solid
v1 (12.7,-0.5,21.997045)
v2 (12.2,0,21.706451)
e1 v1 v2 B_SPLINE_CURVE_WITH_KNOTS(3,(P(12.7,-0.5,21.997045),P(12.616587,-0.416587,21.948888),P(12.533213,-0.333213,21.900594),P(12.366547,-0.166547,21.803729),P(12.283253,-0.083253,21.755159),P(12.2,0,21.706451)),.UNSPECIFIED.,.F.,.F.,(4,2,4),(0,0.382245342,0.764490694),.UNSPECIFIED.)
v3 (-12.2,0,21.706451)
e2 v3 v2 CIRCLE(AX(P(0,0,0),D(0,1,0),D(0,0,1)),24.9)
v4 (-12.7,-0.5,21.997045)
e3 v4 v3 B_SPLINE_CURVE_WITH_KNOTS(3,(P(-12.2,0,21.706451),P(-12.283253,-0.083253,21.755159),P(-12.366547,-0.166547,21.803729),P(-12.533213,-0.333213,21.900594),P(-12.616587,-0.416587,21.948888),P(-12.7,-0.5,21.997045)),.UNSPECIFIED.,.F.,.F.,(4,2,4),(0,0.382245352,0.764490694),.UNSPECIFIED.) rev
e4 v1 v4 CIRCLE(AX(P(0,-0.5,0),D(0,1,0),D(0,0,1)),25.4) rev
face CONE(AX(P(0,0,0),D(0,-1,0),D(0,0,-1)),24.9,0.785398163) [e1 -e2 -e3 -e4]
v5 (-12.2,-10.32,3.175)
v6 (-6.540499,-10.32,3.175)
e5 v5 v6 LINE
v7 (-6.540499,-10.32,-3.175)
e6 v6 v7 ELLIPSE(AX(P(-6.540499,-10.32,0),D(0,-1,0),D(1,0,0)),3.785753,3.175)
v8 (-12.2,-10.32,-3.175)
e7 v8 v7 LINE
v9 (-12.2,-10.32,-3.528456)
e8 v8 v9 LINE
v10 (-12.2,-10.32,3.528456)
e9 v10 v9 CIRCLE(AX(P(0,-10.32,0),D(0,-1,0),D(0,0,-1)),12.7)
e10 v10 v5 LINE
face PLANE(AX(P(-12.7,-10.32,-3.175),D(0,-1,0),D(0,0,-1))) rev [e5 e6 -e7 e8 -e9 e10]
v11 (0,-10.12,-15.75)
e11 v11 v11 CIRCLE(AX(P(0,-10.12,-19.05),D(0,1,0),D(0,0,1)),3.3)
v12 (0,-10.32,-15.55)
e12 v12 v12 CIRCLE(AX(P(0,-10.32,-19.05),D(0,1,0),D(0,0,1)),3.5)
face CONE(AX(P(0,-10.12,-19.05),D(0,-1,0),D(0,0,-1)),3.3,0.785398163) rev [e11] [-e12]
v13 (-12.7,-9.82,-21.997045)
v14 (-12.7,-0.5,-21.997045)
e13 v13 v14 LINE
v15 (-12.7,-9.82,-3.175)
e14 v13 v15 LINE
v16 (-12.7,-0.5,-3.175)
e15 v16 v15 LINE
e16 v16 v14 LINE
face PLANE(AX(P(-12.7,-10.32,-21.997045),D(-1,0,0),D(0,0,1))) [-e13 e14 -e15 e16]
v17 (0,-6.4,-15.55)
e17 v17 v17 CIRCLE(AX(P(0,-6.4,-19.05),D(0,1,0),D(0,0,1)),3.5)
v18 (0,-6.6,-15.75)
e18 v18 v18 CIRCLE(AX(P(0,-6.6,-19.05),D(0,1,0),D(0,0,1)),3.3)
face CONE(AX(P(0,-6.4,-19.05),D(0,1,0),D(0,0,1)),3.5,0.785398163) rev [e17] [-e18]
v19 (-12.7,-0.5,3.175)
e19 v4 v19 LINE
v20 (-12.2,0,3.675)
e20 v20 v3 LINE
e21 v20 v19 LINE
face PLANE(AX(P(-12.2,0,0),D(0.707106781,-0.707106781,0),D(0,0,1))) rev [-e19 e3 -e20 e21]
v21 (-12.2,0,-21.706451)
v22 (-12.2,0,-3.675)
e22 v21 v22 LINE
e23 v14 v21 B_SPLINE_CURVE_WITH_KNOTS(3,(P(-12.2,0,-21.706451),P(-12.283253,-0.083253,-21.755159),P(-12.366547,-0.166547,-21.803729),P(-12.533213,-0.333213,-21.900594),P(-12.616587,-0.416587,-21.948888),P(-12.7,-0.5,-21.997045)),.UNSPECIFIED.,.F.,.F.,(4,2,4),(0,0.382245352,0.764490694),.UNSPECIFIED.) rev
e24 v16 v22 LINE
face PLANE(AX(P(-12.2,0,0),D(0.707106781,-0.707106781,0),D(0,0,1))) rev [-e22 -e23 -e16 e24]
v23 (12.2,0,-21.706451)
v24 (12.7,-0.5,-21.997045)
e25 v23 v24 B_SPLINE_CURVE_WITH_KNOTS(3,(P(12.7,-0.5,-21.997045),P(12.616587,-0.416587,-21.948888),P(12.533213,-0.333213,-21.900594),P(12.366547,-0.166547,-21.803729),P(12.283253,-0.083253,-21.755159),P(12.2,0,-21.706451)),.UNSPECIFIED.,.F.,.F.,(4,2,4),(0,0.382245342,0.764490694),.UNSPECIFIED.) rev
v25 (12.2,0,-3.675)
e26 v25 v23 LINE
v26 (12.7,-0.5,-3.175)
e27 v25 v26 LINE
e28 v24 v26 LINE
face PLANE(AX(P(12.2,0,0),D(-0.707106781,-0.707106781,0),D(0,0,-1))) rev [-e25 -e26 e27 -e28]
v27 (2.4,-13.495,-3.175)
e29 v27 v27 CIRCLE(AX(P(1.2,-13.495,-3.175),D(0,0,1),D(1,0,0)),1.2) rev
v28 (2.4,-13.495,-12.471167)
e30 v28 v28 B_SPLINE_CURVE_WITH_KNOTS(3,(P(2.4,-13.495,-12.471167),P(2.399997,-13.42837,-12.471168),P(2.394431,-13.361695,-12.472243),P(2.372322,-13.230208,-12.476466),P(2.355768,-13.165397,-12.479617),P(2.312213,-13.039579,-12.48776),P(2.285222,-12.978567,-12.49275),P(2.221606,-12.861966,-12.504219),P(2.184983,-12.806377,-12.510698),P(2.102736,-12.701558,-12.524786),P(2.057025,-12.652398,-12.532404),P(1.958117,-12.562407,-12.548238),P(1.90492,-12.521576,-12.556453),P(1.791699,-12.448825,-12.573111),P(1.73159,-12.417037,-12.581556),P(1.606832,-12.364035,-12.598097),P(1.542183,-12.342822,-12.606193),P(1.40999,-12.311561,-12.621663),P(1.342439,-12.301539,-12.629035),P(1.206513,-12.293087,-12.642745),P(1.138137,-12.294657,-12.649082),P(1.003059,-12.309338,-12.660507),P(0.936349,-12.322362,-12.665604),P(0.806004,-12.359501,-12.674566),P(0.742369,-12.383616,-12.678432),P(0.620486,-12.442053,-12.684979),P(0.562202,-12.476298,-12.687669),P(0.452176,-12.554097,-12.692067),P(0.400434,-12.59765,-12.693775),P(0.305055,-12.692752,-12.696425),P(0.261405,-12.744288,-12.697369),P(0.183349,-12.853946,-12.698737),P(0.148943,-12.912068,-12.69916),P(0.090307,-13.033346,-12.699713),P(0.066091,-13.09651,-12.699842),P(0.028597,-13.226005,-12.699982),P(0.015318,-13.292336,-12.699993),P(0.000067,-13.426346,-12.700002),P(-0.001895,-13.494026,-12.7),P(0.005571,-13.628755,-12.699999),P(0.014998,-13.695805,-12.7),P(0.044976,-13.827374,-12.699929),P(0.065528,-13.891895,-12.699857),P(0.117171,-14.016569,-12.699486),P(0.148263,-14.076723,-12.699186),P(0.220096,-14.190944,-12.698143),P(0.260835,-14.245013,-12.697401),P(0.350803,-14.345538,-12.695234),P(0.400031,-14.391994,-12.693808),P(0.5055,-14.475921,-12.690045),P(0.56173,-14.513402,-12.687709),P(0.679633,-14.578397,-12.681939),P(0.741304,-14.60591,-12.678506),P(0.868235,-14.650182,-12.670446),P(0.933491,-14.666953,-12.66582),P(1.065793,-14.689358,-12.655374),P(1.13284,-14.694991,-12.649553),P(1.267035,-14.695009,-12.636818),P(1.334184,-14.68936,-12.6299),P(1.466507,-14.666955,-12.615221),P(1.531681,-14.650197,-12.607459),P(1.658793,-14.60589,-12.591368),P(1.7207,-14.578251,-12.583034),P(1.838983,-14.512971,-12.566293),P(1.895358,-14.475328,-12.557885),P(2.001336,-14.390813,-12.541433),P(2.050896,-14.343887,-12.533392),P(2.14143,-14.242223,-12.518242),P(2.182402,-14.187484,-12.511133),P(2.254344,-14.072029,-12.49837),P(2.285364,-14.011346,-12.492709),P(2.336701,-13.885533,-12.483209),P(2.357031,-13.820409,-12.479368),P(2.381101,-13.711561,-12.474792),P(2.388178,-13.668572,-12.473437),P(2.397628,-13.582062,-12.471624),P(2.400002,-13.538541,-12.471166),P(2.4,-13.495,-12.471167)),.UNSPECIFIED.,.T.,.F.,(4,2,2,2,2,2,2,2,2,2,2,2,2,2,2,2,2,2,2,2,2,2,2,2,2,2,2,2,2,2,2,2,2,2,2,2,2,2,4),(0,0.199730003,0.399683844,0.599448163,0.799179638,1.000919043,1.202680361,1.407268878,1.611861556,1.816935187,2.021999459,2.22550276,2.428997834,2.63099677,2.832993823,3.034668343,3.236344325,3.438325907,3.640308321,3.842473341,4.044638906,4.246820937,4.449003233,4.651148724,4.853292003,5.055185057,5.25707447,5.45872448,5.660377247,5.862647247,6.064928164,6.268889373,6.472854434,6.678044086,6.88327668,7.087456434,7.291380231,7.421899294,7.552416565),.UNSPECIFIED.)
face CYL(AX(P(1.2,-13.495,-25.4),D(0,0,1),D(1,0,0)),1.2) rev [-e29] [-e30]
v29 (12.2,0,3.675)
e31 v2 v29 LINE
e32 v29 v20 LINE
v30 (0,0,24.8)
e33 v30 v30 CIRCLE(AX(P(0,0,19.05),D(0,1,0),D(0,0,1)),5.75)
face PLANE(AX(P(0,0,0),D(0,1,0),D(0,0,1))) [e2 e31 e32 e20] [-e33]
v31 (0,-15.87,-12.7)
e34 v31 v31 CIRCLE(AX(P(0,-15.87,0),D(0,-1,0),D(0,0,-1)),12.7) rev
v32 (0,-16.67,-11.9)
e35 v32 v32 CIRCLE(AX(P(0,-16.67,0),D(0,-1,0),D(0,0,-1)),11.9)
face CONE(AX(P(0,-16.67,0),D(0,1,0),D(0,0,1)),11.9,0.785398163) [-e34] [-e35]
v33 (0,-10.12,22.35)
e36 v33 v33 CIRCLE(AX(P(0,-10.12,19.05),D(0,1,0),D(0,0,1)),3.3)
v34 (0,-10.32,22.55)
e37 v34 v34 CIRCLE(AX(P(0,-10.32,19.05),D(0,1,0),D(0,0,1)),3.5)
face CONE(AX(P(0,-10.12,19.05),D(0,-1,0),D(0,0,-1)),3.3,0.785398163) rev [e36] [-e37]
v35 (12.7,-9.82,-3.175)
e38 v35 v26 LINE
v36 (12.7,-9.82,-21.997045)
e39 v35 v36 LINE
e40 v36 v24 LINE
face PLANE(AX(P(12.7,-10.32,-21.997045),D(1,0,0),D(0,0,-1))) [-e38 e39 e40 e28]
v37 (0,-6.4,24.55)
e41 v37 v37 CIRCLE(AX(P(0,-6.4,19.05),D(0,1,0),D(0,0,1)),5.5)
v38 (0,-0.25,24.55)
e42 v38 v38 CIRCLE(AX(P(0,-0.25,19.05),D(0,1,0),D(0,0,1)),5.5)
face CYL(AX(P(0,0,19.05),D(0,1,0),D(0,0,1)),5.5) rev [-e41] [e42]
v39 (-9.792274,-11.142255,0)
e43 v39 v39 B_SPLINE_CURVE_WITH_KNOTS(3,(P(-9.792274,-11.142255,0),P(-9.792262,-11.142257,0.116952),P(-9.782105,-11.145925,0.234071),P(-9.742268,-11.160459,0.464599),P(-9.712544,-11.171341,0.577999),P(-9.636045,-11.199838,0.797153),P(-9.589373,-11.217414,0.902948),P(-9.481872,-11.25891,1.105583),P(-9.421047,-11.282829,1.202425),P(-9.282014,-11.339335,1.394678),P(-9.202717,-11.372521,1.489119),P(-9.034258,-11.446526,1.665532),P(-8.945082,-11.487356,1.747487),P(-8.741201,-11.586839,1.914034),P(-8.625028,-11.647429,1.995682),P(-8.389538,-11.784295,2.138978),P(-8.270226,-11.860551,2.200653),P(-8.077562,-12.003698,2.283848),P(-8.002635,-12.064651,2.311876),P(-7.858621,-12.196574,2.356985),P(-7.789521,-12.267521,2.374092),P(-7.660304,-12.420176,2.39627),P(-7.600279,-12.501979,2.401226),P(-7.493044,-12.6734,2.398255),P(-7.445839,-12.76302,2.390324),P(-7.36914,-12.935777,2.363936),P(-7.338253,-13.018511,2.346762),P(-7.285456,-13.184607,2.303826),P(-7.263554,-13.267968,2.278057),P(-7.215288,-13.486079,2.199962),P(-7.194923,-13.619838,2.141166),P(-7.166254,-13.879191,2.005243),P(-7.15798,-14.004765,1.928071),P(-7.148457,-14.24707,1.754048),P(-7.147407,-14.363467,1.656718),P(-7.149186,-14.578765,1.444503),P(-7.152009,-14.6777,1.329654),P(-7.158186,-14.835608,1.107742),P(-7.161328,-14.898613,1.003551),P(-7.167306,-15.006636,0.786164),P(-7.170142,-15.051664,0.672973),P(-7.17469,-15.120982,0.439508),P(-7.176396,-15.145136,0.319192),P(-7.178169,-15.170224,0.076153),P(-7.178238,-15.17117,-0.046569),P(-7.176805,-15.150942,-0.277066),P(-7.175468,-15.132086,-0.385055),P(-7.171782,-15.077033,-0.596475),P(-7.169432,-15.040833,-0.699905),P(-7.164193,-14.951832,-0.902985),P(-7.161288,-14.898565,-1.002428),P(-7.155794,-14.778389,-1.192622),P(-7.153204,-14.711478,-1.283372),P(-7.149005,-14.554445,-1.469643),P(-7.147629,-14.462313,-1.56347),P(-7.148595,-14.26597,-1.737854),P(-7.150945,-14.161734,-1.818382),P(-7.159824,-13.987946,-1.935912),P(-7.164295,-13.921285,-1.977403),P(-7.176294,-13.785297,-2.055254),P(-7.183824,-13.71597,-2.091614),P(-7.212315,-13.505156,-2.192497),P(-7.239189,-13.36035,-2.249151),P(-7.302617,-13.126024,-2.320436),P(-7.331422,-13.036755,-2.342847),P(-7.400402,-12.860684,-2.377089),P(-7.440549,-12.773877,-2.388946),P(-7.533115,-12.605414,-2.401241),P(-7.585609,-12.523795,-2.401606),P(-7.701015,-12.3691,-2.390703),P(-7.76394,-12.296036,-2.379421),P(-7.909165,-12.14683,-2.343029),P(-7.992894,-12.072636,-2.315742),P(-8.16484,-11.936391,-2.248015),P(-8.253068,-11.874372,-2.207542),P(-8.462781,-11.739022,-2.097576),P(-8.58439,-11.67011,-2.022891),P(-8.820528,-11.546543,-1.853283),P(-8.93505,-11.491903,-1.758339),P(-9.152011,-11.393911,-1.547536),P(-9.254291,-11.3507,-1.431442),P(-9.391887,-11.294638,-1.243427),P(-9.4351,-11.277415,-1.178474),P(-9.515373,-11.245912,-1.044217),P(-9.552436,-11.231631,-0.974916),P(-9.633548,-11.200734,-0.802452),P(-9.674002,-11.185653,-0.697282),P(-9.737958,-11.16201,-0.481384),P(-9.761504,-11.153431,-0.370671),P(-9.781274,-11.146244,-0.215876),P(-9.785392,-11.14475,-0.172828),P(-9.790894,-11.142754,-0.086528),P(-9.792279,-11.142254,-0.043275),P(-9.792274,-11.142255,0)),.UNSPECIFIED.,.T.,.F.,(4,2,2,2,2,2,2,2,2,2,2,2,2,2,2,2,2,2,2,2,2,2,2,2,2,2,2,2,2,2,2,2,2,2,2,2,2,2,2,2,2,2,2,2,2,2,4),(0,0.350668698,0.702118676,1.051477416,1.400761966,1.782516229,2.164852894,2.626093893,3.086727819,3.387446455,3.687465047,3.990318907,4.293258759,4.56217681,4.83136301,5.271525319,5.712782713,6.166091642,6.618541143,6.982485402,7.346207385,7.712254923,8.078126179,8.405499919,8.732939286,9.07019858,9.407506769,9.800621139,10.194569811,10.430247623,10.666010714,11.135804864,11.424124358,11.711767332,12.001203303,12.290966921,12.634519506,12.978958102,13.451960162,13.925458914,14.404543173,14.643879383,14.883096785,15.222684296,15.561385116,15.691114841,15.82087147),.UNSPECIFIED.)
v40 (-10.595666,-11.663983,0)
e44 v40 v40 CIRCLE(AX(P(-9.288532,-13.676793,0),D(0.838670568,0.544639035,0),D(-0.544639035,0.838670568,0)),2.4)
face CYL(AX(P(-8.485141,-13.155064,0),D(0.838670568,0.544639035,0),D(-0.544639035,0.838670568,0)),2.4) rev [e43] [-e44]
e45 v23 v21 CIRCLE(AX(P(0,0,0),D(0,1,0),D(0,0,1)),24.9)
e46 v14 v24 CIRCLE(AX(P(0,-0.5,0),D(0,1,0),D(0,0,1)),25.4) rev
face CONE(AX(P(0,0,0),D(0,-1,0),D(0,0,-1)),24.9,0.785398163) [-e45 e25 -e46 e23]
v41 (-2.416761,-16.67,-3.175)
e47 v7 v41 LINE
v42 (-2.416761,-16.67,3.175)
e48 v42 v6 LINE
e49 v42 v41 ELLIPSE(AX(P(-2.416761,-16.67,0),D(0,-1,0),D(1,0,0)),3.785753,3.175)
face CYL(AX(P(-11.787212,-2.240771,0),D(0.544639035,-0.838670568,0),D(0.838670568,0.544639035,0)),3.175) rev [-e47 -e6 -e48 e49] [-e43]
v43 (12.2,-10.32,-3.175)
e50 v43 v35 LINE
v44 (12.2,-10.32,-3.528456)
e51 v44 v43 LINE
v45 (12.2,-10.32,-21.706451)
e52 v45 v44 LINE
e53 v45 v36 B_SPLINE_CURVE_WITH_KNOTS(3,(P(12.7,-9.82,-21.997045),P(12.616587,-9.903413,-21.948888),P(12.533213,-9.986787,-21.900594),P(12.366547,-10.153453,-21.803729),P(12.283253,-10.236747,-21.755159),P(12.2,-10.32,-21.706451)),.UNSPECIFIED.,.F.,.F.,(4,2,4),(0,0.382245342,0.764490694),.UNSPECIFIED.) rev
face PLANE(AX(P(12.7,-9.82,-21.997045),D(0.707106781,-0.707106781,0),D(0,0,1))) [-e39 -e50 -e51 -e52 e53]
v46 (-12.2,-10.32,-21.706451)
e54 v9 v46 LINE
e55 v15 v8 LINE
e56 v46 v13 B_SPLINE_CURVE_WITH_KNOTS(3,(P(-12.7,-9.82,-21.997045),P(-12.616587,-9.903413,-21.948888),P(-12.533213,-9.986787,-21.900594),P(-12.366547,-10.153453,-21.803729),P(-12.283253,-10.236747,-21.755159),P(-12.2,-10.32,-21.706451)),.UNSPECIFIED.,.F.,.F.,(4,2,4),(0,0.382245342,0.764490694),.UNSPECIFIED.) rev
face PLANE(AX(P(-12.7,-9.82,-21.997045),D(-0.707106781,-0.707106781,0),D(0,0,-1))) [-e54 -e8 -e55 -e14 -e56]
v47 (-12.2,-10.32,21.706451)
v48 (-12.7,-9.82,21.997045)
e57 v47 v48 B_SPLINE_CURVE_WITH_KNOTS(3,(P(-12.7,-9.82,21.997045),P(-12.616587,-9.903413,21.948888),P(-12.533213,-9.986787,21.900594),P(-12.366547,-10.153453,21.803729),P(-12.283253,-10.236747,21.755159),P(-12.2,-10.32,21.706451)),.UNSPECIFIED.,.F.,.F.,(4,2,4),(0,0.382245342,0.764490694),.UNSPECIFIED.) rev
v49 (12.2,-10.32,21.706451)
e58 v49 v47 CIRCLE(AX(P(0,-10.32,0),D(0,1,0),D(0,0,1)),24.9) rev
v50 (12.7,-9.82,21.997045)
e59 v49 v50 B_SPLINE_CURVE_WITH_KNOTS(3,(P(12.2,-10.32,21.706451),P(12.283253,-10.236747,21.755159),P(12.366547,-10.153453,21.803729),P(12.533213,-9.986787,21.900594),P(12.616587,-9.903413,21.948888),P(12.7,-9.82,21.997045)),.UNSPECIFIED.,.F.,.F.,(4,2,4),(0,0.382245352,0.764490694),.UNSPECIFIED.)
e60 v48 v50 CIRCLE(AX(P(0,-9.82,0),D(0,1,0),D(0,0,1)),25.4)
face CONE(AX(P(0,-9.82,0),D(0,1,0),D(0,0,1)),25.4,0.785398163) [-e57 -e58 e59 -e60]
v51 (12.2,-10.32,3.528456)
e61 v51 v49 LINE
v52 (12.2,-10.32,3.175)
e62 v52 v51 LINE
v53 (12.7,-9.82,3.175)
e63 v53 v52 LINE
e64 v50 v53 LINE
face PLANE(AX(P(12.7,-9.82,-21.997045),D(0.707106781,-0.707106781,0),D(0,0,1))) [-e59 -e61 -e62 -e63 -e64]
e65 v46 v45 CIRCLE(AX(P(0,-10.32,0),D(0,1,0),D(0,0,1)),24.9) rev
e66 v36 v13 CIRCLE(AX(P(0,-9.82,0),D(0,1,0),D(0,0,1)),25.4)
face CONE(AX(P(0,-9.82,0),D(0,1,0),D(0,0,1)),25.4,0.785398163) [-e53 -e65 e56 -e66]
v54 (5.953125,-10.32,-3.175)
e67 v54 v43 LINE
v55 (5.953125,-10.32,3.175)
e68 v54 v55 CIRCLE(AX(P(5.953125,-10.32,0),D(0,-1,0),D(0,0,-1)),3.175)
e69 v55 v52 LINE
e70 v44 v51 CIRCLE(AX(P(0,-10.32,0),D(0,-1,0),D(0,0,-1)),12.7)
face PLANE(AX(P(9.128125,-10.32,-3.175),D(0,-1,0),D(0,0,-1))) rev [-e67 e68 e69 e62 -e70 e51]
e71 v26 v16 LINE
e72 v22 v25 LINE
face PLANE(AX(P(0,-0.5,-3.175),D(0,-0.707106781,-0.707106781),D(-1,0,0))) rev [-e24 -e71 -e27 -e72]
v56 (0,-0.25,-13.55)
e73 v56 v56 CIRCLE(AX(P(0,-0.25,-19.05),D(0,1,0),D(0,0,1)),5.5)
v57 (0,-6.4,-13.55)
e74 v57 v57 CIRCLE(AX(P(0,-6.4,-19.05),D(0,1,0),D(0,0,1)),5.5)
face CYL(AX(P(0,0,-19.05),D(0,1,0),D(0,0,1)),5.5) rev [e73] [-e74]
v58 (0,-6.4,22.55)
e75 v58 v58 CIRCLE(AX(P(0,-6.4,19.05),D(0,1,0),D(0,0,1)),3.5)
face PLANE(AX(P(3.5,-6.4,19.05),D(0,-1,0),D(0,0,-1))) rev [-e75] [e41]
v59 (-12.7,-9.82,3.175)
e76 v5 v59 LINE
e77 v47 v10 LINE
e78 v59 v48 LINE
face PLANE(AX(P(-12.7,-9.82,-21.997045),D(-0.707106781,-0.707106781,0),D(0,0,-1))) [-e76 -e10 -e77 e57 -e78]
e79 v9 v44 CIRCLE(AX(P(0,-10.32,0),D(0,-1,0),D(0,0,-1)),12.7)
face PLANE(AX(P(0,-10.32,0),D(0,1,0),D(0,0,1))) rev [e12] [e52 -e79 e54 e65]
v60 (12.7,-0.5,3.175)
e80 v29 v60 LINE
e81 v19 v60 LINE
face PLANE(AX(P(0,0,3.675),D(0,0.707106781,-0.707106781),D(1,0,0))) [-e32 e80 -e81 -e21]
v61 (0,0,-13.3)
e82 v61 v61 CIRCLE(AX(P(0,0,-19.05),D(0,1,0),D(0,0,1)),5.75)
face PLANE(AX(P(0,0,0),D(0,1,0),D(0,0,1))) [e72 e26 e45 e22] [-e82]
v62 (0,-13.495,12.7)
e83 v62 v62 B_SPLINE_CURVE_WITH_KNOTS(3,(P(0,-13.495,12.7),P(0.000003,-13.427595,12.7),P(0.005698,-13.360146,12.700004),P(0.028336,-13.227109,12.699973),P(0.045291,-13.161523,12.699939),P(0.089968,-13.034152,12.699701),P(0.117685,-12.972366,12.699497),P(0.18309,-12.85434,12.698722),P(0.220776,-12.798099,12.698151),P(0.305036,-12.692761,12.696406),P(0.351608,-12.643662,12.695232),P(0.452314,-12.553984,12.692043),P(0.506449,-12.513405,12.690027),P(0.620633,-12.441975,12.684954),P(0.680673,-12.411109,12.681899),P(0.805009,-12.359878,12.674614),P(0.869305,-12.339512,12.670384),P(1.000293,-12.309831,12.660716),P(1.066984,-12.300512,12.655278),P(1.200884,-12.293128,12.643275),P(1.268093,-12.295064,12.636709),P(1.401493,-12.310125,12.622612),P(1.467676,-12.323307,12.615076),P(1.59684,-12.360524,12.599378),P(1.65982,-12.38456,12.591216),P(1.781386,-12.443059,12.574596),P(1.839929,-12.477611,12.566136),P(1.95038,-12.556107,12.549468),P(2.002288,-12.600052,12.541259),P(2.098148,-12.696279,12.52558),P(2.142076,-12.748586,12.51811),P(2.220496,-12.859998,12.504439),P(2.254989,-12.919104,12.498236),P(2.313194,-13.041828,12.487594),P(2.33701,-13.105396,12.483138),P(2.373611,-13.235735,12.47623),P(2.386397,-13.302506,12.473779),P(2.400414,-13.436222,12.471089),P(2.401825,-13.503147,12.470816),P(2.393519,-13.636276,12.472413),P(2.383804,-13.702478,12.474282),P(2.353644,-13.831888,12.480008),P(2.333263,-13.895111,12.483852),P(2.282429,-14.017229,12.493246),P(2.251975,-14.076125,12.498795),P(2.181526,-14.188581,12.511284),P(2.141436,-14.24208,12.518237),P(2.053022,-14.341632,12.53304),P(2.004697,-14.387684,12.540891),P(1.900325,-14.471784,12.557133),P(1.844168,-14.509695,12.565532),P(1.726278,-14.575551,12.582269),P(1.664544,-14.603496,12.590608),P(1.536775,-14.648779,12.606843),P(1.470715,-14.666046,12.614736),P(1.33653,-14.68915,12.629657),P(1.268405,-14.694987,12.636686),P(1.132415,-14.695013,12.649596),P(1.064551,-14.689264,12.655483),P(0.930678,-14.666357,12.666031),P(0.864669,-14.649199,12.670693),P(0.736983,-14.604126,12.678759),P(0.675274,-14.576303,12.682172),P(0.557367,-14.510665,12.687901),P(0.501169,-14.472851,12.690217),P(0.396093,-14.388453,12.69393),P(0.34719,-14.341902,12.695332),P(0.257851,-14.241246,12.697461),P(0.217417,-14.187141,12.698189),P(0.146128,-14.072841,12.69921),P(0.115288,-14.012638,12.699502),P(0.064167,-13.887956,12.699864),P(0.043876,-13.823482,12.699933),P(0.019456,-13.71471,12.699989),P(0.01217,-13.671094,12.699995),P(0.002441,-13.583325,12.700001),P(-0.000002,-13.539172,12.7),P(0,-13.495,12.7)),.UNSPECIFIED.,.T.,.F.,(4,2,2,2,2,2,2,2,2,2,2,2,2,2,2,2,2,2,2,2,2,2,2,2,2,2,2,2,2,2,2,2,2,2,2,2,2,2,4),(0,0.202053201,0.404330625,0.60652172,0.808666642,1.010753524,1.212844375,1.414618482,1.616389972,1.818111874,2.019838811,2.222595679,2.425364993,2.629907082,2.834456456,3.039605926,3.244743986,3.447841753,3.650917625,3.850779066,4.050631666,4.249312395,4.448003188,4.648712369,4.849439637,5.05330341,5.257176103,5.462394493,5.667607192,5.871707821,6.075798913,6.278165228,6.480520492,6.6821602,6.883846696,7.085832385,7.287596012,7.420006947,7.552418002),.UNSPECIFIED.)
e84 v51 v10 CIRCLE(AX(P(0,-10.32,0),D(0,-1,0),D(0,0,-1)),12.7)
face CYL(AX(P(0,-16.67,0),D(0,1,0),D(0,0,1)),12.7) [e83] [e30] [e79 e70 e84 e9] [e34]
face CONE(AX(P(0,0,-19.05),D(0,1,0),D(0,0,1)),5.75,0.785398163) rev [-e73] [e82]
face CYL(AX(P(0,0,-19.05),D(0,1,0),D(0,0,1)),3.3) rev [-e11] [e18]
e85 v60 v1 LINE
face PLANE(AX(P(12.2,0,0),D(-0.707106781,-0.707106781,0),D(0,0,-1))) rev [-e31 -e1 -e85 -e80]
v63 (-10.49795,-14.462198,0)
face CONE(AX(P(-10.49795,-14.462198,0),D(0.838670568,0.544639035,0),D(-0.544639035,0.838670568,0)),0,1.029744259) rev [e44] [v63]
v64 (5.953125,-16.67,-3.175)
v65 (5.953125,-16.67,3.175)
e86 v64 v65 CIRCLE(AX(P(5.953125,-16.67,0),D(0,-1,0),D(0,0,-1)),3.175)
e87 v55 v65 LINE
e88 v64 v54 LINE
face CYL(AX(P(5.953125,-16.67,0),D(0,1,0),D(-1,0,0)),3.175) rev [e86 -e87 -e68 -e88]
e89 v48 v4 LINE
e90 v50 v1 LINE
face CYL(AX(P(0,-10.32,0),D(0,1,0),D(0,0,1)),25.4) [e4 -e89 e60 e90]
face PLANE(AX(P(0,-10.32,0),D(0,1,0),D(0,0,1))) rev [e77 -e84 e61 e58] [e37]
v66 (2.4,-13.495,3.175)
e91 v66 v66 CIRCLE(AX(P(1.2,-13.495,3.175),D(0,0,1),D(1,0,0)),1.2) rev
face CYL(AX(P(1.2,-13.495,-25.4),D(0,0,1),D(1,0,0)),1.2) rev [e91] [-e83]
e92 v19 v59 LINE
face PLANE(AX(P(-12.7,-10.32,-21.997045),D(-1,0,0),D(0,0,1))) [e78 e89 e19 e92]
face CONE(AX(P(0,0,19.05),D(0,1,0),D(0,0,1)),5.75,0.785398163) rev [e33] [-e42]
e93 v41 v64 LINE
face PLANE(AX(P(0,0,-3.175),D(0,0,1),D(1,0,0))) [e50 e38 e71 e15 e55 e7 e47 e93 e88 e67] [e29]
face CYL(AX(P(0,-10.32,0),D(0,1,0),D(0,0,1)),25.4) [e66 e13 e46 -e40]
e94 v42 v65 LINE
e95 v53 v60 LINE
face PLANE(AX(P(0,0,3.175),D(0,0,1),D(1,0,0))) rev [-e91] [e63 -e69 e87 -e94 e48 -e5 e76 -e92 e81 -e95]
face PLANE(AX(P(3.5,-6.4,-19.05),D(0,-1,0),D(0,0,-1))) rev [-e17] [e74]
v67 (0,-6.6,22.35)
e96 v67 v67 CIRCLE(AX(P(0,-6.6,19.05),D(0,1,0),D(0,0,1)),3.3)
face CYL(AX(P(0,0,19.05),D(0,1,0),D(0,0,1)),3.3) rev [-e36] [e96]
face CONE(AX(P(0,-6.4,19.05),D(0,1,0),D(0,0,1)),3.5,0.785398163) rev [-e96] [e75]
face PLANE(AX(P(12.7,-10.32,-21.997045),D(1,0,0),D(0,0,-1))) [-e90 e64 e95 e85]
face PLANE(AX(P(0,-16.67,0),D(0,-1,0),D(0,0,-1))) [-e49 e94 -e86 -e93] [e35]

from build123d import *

# Parameters (mm, degrees)
BOSS_EXTRUDE1_DEPTH                          = 10.32
SKETCH2_R                                    = 12.7
BOSS_EXTRUDE2_DEPTH                          = 6.35
CUT_EXTRUDE3_DEPTH                           = 33.929301541
CUT_EXTRUDE3_DEPTH_BACK                      = 33.929301541
SKETCH9_R                                    = 1.2
CUT_EXTRUDE4_DEPTH                           = 3.175
CBORE_FOR_M6_HEX_SOCKET_HEAD_CAP_SCR_2_COUNT = 2
CBORE_FOR_M6_HEX_SOCKET_HEAD_CAP_SCR_2_PITCH = 38.1
FILLET2_R                                    = 3.175
FILLET3_R                                    = 3.175
CHAMFER2_SIZE                                = 0.8
CHAMFER3_SIZE                                = 0.5


# Some blends are built 0.0001 mm under size
with BuildPart() as part:
    # Sketch1 → Boss-Extrude1 (new body)
    with BuildSketch(Plane(origin=(0, 0, 0), x_dir=(1, 0, 0), z_dir=(0, 1, 0))):
        with BuildLine():
            Line((-12.7, 21.997045256), (-12.7, -21.997045256))
            ThreePointArc((-12.7, -21.997045256), (0, -25.4), (12.7, -21.997045256))
            Line((12.7, -21.997045256), (12.7, 21.997045256))
            ThreePointArc((12.7, 21.997045256), (0, 25.4), (-12.7, 21.997045256))
        make_face()
    extrude(amount=-BOSS_EXTRUDE1_DEPTH)

    # Sketch2 → Boss-Extrude2 (add)
    with BuildSketch(Plane.XZ.offset(10.32)):
        with Locations(Location((0, 0, 0), (0, 0, 180))):
            Circle(SKETCH2_R)
    extrude(amount=BOSS_EXTRUDE2_DEPTH)

    # Sketch9 → Cut-Extrude3 (cut, two sides: drawn at the far end of the back side and taken through both)
    with BuildSketch(Plane.XY.offset(-CUT_EXTRUDE3_DEPTH_BACK)):
        with Locations((1.2, -13.495)):
            Circle(SKETCH9_R)
    extrude(amount=CUT_EXTRUDE3_DEPTH + CUT_EXTRUDE3_DEPTH_BACK, mode=Mode.SUBTRACT)

    # Sketch10 → Cut-Extrude4 (cut, symmetric)
    with BuildSketch(Plane.XY):
        Polygon((9.128125, -16.67), (9.128125, -10.32), (12.7, -10.32), (12.7, 0), (-12.7, 0), (-12.7, -10.32), (-10.326252745, -10.32), (-6.202514528, -16.67), align=None)
    extrude(amount=CUT_EXTRUDE4_DEPTH, both=True, mode=Mode.SUBTRACT)

    # Sketch13 → CBORE for M6 Hex Socket Head Cap Screw2 (revolve, cut)
    with BuildSketch(Plane(origin=(0, 0, -19.05), x_dir=(0, 0, 1), z_dir=(1, 0, 0))):
        Polygon((0, 0), (0, 10.32), (3.5, 10.32), (3.3, 10.12), (3.3, 6.6), (3.5, 6.4), (5.5, 6.4), (5.5, 0.25), (5.75, 0), align=None)
    cbore_for_m6_hex_socket_head_cap_screw2 = revolve(axis=Axis((0, 6.35, -19.05), (0, -1, 0)), mode=Mode.SUBTRACT)

    # CBORE for M6 Hex Socket Head Cap Scr 2: CBORE for M6 Hex Socket Head Cap Screw2 ×2
    with Locations(*[(0, 0, i * CBORE_FOR_M6_HEX_SOCKET_HEAD_CAP_SCR_2_PITCH) for i in range(1, CBORE_FOR_M6_HEX_SOCKET_HEAD_CAP_SCR_2_COUNT)]):
        add(cbore_for_m6_hex_socket_head_cap_screw2, mode=Mode.SUBTRACT)

    # Fillet2
    fillet2_edges = [part.edges().sort_by_distance(p)[0] for p in [
        (9.128125, -13.495, 3.175),
        (9.128125, -13.495, -3.175),
    ]]
    fillet(fillet2_edges, radius=FILLET2_R - 0.0001)  # a hair under: the kernel refuses the full size

    # Fillet3
    fillet3_edges = [part.edges().sort_by_distance(p)[0] for p in [
        (-8.264383637, -13.495, 3.175),
        (-8.264383637, -13.495, -3.175),
    ]]
    fillet(fillet3_edges, radius=FILLET3_R - 0.0001)  # a hair under: the kernel refuses the full size

    # Sketch14 → Cut-Revolve5 (revolve, cut)
    with BuildSketch(Plane.XY, mode=Mode.PRIVATE) as cut_revolve5_sk:
        Polygon((-2.984654144, -12.444678171), (-7.981398467, -15.689601875), (-10.497950031, -14.462197667), (-4.291787828, -10.431868808), align=None)
    revolve(cut_revolve5_sk.sketch.rotate(Axis((-8.485140668, -13.155063983, 0), (-0.8386705679454227, -0.5446390350150291, 0)), 180), axis=Axis((-8.485140668, -13.155063983, 0), (-0.8386705679454227, -0.5446390350150291, 0)), mode=Mode.SUBTRACT)

    # Chamfer2
    chamfer2_edges = [part.edges().sort_by_distance(p)[0] for p in [
        (12.7, -16.67, 0),
    ]]
    chamfer(chamfer2_edges, length=CHAMFER2_SIZE)

    # Chamfer3
    # the kernel refuses this chamfer: 0.5 mm, written as the material it takes off along each edge
    with BuildSketch(Plane(origin=(0, -10.32, 0), x_dir=(-0.5431897052031074, 0, 0.839609995272425), z_dir=(-0.839609995272425, 0, -0.5431897052031074))) as chamfer3_piece_1:
        Polygon((25.4 - CHAMFER3_SIZE, 0), (25.4, CHAMFER3_SIZE), (25.4, 0), align=None)
    revolve(axis=Axis((0, -10.32, 0), (0, 1, 0)), revolution_arc=65.802082053, mode=Mode.SUBTRACT)
    with BuildSketch(Plane(origin=(12.7, -10.32, 23.28288675), x_dir=(-0.9996219169112968, -0.027495876610585647, 0), z_dir=(0, 0, -1)), Plane(origin=(12.7, 0, -1.889158506), x_dir=(0.02749587661058563, -0.9996219169112968, 0), z_dir=(0, 0, -1)), Plane(origin=(12.7, -10.32, -1.889158506), x_dir=(-0.9996219169112968, -0.027495876610585647, 0), z_dir=(0, 0, -1)), Plane(origin=(-12.7, -10.32, 1.889158506), x_dir=(0.9996219169112968, -0.027495876610585647, 0), z_dir=(0, 0, 1)), Plane(origin=(12.7, 0, 23.28288675), x_dir=(0.02749587661058563, -0.9996219169112968, 0), z_dir=(0, 0, -1)), Plane(origin=(-12.7, -10.32, -23.28288675), x_dir=(0.9996219169112968, -0.027495876610585647, 0), z_dir=(0, 0, 1))) as chamfer3_piece_2:
        Polygon((CHAMFER3_SIZE * 0.999621916911, CHAMFER3_SIZE * 0.0274958766106), (-CHAMFER3_SIZE * 0.0274958766106, CHAMFER3_SIZE * 0.999621916911), (0, 0), align=None)
    extrude(amount=21.393728244, mode=Mode.SUBTRACT)
    with BuildSketch(Plane(origin=(-12.7, 0, 1.889158506), x_dir=(0.9996219169112968, 0.02749587661058639, 0), z_dir=(0, 0, 1)), Plane(origin=(-12.7, 0, -23.28288675), x_dir=(0.9996219169112968, 0.02749587661058639, 0), z_dir=(0, 0, 1))) as chamfer3_piece_3:
        Polygon((CHAMFER3_SIZE * 0.999621916911, -CHAMFER3_SIZE * 0.0274958766106), (-CHAMFER3_SIZE * 0.0274958766106, -CHAMFER3_SIZE * 0.999621916911), (0, 0), align=None)
    extrude(amount=21.393728244, mode=Mode.SUBTRACT)
    with BuildSketch(Plane(origin=(13.985841494, 0, 3.175), x_dir=(0, -0.9996219169112968, -0.027495876610586494), z_dir=(-1, 0, 0))) as chamfer3_piece_4:
        Polygon((CHAMFER3_SIZE * 0.999621916911, CHAMFER3_SIZE * 0.0274958766106), (-CHAMFER3_SIZE * 0.0274958766106, CHAMFER3_SIZE * 0.999621916911), (0, 0), align=None)
    extrude(amount=27.971682988, mode=Mode.SUBTRACT)
    with BuildSketch(Plane(origin=(13.985841494, 0, -3.175), x_dir=(0, -0.9996219169112968, 0.027495876610586494), z_dir=(-1, 0, 0))) as chamfer3_piece_5:
        Polygon((CHAMFER3_SIZE * 0.999621916911, -CHAMFER3_SIZE * 0.0274958766106), (-CHAMFER3_SIZE * 0.0274958766106, -CHAMFER3_SIZE * 0.999621916911), (0, 0), align=None)
    extrude(amount=27.971682988, mode=Mode.SUBTRACT)
    with BuildSketch(Plane(origin=(0, -10.32, 0), x_dir=(0.5431897052031078, 0, -0.8396099952724246), z_dir=(0.8396099952724246, 0, 0.5431897052031078))) as chamfer3_piece_6:
        Polygon((25.4 - CHAMFER3_SIZE, 0), (25.4, CHAMFER3_SIZE), (25.4, 0), align=None)
    revolve(axis=Axis((0, -10.32, 0), (0, 1, 0)), revolution_arc=65.802082053, mode=Mode.SUBTRACT)
    with BuildSketch(Plane(origin=(0, 0, 0), x_dir=(-0.5431897052031074, 0, 0.839609995272425), z_dir=(-0.839609995272425, 0, -0.5431897052031074))) as chamfer3_piece_7:
        Polygon((25.4 - CHAMFER3_SIZE, 0), (25.4, -CHAMFER3_SIZE), (25.4, 0), align=None)
    revolve(axis=Axis((0, 0, 0), (0, 1, 0)), revolution_arc=65.802082053, mode=Mode.SUBTRACT)
    with BuildSketch(Plane(origin=(0, 0, 0), x_dir=(0.5431897052031078, 0, -0.8396099952724246), z_dir=(0.8396099952724246, 0, 0.5431897052031078))) as chamfer3_piece_8:
        Polygon((25.4 - CHAMFER3_SIZE, 0), (25.4, -CHAMFER3_SIZE), (25.4, 0), align=None)
    revolve(axis=Axis((0, 0, 0), (0, 1, 0)), revolution_arc=65.802082053, mode=Mode.SUBTRACT)


solid = part.part
